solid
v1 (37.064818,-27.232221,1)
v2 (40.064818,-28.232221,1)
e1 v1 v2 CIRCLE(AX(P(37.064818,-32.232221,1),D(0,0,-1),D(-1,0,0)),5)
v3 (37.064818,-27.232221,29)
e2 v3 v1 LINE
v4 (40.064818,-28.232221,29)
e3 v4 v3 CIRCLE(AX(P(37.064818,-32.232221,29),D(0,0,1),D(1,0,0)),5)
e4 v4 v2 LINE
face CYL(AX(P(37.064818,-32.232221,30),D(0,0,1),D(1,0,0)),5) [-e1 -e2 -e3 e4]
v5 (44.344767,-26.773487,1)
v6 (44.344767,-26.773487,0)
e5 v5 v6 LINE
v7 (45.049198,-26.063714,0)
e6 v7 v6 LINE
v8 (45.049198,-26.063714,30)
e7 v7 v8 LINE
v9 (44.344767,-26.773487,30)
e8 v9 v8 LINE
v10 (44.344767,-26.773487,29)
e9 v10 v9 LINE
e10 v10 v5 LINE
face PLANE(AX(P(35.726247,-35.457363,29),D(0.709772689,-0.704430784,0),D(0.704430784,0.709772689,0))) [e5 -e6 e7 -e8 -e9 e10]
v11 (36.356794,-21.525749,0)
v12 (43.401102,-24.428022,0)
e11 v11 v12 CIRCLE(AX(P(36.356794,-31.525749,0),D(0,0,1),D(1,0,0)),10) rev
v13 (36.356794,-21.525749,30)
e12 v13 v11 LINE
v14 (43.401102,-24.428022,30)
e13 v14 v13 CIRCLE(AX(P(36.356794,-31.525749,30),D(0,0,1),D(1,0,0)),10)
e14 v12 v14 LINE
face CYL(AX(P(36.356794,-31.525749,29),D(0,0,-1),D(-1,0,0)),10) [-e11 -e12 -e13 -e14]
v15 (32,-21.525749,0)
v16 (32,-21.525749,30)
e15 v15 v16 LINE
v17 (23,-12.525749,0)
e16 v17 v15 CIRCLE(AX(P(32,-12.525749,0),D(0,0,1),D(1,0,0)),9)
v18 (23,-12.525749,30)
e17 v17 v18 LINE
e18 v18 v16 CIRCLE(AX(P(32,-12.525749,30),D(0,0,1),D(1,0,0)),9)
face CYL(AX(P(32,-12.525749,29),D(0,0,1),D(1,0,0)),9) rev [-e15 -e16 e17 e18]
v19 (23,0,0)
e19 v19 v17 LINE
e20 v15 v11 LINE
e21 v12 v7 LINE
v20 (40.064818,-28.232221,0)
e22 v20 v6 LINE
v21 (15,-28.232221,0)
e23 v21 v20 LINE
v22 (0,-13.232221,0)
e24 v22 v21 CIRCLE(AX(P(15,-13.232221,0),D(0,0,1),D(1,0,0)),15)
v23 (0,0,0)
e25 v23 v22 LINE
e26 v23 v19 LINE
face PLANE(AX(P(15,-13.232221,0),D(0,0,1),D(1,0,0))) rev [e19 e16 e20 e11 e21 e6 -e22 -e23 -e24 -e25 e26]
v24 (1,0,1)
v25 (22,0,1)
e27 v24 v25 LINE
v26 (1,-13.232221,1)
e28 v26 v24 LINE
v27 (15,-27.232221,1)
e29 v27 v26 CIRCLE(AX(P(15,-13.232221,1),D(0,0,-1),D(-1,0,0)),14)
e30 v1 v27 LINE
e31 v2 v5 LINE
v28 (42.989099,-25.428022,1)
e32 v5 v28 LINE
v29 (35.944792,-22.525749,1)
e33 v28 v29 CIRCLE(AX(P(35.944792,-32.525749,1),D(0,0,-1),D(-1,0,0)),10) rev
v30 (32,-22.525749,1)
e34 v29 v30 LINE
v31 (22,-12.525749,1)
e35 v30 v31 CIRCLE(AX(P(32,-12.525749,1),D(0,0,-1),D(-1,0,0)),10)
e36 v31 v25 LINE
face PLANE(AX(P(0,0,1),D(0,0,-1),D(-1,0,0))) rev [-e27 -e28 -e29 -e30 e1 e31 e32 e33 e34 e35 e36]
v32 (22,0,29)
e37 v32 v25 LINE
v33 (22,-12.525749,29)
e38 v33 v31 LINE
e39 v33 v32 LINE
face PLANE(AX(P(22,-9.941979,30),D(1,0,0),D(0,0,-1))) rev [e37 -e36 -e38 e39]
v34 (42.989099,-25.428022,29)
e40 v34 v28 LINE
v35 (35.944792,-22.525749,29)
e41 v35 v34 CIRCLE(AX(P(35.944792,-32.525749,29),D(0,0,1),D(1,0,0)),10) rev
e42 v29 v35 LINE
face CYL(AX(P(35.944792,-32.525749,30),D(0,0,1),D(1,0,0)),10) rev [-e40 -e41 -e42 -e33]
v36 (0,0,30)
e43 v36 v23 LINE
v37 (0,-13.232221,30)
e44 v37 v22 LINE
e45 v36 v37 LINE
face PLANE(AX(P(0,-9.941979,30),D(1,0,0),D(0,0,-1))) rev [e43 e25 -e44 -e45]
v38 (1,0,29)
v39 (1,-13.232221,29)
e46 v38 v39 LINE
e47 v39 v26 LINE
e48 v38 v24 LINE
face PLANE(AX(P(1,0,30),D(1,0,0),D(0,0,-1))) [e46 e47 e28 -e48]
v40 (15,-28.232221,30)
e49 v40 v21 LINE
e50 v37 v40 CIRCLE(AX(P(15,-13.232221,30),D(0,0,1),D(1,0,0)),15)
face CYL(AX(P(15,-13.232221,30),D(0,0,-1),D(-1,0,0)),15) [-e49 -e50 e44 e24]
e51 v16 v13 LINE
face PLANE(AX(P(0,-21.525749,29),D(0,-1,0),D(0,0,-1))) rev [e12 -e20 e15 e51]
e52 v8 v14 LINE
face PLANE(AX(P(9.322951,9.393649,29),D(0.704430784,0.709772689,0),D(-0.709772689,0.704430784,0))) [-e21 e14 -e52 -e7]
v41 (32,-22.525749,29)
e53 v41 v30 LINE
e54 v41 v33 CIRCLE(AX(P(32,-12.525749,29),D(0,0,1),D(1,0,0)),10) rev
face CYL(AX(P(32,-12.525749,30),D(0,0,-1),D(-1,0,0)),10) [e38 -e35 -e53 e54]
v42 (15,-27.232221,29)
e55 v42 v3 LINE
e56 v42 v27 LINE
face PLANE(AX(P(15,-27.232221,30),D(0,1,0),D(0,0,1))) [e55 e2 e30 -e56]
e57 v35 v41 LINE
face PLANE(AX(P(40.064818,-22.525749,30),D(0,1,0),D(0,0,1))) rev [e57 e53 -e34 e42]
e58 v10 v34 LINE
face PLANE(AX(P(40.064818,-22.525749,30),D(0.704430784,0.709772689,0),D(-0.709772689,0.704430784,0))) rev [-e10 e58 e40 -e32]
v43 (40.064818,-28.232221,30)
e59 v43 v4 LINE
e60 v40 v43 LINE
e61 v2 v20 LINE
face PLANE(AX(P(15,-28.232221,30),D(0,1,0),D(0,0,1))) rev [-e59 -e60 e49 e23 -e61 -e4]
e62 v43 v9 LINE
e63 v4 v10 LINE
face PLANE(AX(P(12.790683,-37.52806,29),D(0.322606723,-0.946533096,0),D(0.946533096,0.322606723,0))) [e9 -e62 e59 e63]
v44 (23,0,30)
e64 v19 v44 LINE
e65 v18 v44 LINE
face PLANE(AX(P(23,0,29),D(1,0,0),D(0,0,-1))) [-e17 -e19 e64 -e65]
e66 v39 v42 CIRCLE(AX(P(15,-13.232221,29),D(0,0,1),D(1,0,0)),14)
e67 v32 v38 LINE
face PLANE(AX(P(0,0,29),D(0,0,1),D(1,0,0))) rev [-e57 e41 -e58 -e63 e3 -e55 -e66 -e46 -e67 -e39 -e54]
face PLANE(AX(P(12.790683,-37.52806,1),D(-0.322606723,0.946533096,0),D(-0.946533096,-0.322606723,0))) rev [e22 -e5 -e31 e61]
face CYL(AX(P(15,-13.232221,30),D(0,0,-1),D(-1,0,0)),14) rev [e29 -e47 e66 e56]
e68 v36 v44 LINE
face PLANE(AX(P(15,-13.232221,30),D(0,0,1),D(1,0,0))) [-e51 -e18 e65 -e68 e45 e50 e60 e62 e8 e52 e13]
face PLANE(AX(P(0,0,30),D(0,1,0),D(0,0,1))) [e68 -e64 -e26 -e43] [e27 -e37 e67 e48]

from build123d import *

# Parameters (mm, degrees)
EXTRUDE_THIN1_DEPTH   = 30
EXTRUDE_THIN1_2_DEPTH = 30
BOSS_EXTRUDE1_START   = -1
BOSS_EXTRUDE1_DEPTH   = 1
BOSS_EXTRUDE2_DEPTH   = 1
FILLET1_R             = 10
FILLET2_R             = 5


with BuildPart() as part:
    # Sketch1 → Extrude-Thin1 (new body)
    with BuildSketch(Plane.XY):
        with BuildLine():
            Line((0, 0), (0, -9.941978892))
            Line((0, -9.941978892), (0, -13.23222107))
            ThreePointArc((0, -13.23222107), (4.393398282, -23.838822788), (15, -28.23222107))
            Line((15, -28.23222107), (40.06481759, -28.23222107))
            Line((40.06481759, -28.23222107), (40.06481759, -27.23222107))
            Line((40.06481759, -27.23222107), (15, -27.23222107))
            ThreePointArc((15, -27.23222107), (5.100505063, -23.131716006), (1, -13.23222107))
            Line((1, -13.23222107), (1, -9.941978892))
            Line((1, -9.941978892), (1, 0))
            Line((1, 0), (0, 0))
        make_face()
    extrude(amount=EXTRUDE_THIN1_DEPTH)



with BuildPart() as body_2:
    # Sketch1 → Extrude-Thin1 2 (new body)
    with BuildSketch(Plane.XY):
        with BuildLine():
            Line((22, 0), (22, -9.941978892))
            Line((22, -9.941978892), (22, -12.525749024))
            ThreePointArc((22, -12.525749024), (24.928932188, -19.596816836), (32, -22.525749024))
            Line((32, -22.525749024), (40.06481759, -22.525749024))
            Line((40.06481759, -22.525749024), (44.344767003, -26.773486601))
            Line((44.344767003, -26.773486601), (45.049197787, -26.063713912))
            Line((45.049197787, -26.063713912), (40.476820184, -21.525749024))
            Line((40.476820184, -21.525749024), (32, -21.525749024))
            ThreePointArc((32, -21.525749024), (25.636038969, -18.889710055), (23, -12.525749024))
            Line((23, -12.525749024), (23, -9.941978892))
            Line((23, -9.941978892), (23, 0))
            Line((23, 0), (22, 0))
        make_face()
    extrude(amount=EXTRUDE_THIN1_2_DEPTH)


with BuildPart() as part_1:
    add(part.part)

    add(body_2.part)  # Boss-Extrude1 merges body 2
    # Sketch2 → Boss-Extrude1 (add)
    with BuildSketch(Plane.XY.offset(30).offset(BOSS_EXTRUDE1_START)):
        with BuildLine():
            Line((40.476820184, -21.525749024), (32, -21.525749024))
            ThreePointArc((32, -21.525749024), (25.636038969, -18.889710055), (23, -12.525749024))
            Line((23, -12.525749024), (23, 0))
            Line((23, 0), (22, 0))
            Line((22, 0), (1, 0))
            Line((1, 0), (0, 0))
            Line((0, 0), (0, -13.23222107))
            ThreePointArc((0, -13.23222107), (4.393398282, -23.838822788), (15, -28.23222107))
            Line((15, -28.23222107), (40.06481759, -28.23222107))
            Line((40.06481759, -28.23222107), (44.344767003, -26.773486601))
            Line((44.344767003, -26.773486601), (45.049197787, -26.063713912))
            Line((45.049197787, -26.063713912), (40.476820184, -21.525749024))
        make_face()
    extrude(amount=BOSS_EXTRUDE1_DEPTH)

    # Sketch3 → Boss-Extrude2 (add)
    with BuildSketch(Plane(origin=(0, 0, 0), x_dir=(-1, 0, 0), z_dir=(0, 0, -1))):
        with BuildLine():
            Line((-44.344767003, -26.773486601), (-40.06481759, -28.23222107))
            Line((-40.06481759, -28.23222107), (-15, -28.23222107))
            ThreePointArc((-15, -28.23222107), (-4.393398282, -23.838822788), (0, -13.23222107))
            Line((0, -13.23222107), (0, 0))
            Line((0, 0), (-1, 0))
            Line((-1, 0), (-22, 0))
            Line((-22, 0), (-23, 0))
            Line((-23, 0), (-23, -12.525749024))
            ThreePointArc((-23, -12.525749024), (-25.636038969, -18.889710055), (-32, -21.525749024))
            Line((-32, -21.525749024), (-40.476820184, -21.525749024))
            Line((-40.476820184, -21.525749024), (-45.049197787, -26.063713912))
            Line((-45.049197787, -26.063713912), (-44.344767003, -26.773486601))
        make_face()
    extrude(amount=-BOSS_EXTRUDE2_DEPTH)

    # Fillet1
    fillet1_edges = [part_1.edges().sort_by_distance(p)[0] for p in [
        (40.476820184, -21.525749024, 15),
        (40.06481759, -22.525749024, 15),
    ]]
    fillet(fillet1_edges, radius=FILLET1_R)

    # Fillet2
    # the kernel refuses this fillet: 5 mm, written as the material it takes off along each edge
    with BuildSketch(Plane(origin=(40.06481759, -27.23222107, 1), x_dir=(0, -1, 0), z_dir=(0, 0, 1))) as fillet2_piece_1:
        with BuildLine():
            CenterArc((5, -3), FILLET2_R, 143.130102354, 36.869897646)
            Line((0, -3), (0, 0))
            Line((0, 0), (1, 0))
        make_face()
    extrude(amount=28, mode=Mode.SUBTRACT)


solid = part_1.part
